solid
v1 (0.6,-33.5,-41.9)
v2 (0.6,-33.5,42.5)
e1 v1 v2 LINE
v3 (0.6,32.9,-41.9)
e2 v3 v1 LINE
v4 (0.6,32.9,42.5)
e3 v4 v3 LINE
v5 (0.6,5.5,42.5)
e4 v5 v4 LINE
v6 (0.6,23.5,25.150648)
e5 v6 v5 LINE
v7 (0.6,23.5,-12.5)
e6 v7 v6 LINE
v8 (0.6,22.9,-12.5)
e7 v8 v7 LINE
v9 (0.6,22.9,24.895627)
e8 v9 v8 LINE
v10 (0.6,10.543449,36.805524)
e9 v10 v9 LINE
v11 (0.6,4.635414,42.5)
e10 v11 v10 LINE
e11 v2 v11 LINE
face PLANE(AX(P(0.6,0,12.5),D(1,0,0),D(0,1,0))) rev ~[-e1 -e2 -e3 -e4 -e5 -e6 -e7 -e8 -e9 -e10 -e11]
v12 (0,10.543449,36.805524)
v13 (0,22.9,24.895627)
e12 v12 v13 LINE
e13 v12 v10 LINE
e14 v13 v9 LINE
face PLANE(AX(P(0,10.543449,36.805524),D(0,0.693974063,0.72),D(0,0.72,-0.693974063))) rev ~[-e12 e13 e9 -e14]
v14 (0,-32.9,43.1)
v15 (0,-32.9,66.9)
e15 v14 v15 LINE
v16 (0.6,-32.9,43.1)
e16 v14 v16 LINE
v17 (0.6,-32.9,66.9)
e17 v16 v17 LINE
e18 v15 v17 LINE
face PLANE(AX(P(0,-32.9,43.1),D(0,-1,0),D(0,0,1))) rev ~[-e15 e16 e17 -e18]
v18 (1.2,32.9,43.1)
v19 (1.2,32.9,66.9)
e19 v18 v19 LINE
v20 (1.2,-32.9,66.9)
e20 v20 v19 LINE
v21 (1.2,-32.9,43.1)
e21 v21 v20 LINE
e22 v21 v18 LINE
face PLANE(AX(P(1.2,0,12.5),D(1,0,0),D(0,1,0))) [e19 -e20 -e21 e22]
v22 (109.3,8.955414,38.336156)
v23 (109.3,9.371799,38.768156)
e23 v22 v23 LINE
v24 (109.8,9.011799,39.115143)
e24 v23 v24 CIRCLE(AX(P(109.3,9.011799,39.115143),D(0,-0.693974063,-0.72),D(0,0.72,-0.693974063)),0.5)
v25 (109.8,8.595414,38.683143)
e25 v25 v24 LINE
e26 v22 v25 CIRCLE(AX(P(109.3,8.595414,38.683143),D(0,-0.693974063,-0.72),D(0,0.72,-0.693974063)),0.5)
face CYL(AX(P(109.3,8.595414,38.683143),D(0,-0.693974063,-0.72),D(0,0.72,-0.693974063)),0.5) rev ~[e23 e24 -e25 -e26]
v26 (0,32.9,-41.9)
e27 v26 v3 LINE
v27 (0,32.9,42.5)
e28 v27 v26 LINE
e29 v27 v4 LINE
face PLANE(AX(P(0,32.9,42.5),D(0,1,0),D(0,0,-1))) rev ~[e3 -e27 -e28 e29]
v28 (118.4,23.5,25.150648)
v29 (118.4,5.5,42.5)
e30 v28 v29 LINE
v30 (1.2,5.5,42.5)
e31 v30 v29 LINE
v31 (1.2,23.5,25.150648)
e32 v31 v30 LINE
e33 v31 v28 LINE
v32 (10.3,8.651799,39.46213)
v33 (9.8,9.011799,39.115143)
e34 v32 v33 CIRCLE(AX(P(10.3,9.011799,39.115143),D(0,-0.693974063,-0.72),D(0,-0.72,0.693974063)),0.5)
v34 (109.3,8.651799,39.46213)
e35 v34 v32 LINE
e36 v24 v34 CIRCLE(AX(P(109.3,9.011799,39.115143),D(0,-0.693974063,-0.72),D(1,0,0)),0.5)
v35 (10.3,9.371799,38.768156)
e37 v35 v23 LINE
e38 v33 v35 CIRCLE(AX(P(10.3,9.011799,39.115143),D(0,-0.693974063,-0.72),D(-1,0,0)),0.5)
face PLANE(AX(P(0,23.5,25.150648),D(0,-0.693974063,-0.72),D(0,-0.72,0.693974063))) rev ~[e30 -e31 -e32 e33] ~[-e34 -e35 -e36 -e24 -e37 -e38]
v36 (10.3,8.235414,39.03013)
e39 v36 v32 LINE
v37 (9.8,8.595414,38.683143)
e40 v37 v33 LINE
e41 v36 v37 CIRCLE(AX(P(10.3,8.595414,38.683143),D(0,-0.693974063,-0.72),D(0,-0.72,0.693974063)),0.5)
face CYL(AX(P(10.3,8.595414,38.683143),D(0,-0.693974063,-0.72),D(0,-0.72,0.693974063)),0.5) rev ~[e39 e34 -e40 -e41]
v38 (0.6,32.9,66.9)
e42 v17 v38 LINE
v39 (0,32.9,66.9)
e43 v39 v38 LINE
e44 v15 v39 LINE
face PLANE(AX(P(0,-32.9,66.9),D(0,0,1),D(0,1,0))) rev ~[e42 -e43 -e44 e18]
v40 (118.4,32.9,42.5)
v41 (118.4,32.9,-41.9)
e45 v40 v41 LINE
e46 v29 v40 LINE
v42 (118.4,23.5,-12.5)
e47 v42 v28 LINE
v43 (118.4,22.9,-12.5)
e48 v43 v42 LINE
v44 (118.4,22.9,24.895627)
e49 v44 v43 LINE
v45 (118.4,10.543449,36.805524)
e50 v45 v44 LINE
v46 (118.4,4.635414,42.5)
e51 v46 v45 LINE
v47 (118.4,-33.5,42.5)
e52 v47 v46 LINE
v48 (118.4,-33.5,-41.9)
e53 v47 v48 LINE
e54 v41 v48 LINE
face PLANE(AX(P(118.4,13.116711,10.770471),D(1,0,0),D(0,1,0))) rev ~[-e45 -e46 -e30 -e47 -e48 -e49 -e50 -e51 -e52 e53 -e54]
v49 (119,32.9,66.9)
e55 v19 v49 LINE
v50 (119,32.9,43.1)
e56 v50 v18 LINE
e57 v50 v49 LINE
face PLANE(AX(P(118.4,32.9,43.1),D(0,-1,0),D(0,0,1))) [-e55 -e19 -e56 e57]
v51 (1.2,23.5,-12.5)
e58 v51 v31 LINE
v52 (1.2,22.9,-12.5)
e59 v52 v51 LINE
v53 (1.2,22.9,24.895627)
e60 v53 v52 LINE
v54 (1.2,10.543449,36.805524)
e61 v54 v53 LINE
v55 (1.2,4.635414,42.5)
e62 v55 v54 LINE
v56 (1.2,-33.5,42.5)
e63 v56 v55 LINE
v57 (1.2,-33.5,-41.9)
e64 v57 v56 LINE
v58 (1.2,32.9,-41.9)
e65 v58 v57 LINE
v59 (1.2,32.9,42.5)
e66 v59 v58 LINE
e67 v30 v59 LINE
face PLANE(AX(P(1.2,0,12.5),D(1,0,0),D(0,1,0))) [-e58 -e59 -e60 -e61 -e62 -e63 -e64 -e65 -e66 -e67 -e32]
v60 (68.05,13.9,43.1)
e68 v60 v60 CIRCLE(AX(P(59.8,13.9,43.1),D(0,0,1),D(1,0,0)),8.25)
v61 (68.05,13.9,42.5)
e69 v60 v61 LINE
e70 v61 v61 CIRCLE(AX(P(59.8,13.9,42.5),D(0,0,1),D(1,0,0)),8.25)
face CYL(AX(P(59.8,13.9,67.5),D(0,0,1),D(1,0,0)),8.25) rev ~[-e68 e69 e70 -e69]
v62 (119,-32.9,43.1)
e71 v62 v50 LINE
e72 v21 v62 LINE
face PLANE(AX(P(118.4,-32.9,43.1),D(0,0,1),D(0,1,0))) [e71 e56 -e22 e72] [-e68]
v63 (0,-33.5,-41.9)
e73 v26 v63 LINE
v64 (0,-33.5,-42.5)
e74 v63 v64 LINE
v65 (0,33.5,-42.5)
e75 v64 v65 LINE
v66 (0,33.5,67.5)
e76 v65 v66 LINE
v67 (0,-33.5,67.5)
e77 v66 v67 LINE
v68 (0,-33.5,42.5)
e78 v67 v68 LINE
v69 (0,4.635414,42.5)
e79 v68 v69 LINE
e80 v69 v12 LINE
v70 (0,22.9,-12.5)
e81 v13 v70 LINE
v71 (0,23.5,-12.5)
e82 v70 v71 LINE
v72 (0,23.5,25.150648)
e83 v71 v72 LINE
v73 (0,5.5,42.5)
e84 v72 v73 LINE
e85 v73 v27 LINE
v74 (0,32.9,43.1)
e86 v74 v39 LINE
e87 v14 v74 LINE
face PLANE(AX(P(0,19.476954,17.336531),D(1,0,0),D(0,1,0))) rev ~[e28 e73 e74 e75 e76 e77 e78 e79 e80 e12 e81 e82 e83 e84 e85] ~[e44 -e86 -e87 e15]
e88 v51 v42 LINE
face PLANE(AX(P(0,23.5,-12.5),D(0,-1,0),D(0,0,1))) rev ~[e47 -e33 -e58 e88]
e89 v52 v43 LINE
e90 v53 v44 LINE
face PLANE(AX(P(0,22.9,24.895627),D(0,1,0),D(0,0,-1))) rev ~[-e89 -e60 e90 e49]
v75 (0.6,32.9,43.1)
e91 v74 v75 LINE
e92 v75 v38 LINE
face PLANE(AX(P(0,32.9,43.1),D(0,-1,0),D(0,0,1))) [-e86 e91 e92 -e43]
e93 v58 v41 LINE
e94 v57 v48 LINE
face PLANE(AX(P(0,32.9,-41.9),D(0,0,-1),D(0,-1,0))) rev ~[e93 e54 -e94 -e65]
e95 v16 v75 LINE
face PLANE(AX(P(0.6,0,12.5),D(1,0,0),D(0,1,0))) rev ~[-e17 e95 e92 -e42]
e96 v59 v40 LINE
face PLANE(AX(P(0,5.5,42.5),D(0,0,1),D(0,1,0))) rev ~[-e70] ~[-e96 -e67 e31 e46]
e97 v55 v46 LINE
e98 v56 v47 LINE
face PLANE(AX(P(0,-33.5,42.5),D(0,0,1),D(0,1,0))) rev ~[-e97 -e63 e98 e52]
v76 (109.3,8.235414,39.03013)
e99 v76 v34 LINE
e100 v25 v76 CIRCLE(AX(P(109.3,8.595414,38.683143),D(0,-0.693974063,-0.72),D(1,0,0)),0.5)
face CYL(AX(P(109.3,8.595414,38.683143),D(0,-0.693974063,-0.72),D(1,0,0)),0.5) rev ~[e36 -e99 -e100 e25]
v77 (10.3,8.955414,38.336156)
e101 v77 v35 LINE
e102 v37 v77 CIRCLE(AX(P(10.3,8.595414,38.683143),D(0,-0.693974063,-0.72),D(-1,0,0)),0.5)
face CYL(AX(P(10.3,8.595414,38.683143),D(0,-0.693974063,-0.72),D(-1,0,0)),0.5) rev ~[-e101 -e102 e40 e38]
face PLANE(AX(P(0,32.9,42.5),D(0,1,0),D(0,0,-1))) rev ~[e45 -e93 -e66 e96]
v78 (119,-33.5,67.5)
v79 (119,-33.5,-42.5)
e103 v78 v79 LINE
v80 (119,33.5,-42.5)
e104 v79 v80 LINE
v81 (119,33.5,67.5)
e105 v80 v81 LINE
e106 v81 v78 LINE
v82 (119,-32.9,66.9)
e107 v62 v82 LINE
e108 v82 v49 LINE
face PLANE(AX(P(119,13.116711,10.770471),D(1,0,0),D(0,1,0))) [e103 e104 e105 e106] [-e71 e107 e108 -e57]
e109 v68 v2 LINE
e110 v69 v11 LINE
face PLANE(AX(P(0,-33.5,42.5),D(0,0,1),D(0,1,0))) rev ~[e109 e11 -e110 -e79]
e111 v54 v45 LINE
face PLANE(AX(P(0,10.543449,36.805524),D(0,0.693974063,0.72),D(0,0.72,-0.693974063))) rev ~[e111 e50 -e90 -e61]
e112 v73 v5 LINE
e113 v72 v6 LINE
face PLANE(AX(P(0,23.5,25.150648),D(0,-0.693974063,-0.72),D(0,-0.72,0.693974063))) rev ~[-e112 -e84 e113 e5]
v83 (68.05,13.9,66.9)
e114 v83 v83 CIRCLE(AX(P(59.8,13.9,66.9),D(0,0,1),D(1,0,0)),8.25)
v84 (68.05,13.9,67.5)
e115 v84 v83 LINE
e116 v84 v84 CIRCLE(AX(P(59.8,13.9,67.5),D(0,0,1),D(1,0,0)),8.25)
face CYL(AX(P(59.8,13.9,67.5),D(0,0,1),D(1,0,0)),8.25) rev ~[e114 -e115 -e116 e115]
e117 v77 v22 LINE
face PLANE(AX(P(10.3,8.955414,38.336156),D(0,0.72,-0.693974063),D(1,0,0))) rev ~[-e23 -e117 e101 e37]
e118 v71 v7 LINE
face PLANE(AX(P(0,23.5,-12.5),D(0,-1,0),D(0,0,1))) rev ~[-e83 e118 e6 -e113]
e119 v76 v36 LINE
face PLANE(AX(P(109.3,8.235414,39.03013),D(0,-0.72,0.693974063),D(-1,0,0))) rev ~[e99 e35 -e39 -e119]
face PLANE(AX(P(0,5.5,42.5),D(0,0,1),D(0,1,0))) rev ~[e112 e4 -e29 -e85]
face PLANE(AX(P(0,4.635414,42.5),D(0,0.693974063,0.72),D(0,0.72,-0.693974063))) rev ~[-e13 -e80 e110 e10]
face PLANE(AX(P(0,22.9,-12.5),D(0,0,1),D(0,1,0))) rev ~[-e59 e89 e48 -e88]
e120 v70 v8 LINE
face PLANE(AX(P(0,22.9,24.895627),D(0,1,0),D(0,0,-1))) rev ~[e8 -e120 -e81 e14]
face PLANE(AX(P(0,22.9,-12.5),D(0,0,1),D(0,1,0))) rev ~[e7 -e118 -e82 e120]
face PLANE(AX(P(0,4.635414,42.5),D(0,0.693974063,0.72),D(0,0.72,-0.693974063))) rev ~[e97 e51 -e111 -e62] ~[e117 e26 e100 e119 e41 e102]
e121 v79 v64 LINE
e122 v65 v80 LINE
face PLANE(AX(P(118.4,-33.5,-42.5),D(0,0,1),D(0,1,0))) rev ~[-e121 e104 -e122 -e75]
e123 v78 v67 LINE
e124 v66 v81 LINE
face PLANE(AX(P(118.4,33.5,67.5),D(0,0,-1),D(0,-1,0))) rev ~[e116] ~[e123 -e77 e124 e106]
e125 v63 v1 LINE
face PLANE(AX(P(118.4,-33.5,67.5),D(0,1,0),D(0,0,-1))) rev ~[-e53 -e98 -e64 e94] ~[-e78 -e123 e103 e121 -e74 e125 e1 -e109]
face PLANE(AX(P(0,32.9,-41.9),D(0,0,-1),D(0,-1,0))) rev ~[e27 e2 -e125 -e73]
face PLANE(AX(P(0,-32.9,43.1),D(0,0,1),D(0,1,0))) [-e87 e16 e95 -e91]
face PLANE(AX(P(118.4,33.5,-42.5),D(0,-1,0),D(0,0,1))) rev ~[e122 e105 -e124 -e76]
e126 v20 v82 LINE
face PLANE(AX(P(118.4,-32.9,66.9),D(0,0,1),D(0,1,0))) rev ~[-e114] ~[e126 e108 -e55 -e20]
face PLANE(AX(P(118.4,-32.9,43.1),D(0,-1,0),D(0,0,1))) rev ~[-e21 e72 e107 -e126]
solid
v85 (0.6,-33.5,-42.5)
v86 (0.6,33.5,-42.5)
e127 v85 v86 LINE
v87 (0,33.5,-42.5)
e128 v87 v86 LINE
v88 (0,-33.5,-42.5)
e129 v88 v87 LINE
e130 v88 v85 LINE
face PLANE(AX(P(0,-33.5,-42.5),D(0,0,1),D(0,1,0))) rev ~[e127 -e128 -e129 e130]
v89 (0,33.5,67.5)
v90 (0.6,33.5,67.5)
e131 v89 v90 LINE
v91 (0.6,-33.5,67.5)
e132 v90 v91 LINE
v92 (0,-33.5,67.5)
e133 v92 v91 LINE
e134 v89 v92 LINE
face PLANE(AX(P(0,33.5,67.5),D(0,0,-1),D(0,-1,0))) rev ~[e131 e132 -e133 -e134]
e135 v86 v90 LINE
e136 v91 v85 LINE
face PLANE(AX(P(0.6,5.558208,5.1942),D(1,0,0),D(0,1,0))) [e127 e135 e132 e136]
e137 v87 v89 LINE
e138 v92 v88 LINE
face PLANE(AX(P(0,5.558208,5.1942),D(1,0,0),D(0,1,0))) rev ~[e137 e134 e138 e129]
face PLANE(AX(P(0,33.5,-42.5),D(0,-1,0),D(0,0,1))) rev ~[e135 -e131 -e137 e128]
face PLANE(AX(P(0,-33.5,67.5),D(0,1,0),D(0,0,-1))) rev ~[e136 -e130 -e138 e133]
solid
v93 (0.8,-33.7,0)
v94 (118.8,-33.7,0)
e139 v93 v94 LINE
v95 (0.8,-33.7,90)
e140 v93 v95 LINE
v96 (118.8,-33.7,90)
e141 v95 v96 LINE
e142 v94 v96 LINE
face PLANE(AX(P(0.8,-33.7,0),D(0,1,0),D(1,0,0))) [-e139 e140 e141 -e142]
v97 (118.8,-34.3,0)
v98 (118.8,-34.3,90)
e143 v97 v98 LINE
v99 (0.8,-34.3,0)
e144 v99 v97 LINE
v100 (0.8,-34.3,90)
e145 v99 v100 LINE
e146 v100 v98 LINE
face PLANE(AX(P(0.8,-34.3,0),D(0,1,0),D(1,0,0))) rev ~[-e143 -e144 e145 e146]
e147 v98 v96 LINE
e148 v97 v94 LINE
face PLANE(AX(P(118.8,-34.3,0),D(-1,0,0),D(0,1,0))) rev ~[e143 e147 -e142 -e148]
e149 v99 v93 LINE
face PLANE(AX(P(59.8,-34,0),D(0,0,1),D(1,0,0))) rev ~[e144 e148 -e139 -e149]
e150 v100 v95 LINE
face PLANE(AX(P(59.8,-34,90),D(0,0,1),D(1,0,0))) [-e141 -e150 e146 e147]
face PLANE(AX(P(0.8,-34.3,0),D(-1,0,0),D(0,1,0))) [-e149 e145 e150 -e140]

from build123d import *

# Parameters (mm, degrees)
F0_W      = 65.8
F0_H      = 23.8
F1_DEPTH  = 118.4
F2_DEPTH  = 0.6
F3_W      = 65.8
F3_H      = 23.8
F2_FACE_W = 67
F2_FACE_H = 110
F4_DEPTH  = 0.6
F7_DEPTH  = 1
F8_W      = 118
F8_H      = 0.6
F9_DEPTH  = 90
F10_DEPTH = 25


# Not quite as in the source:
# - a feature names something its author has since deleted; it is built from what else it names


with BuildPart() as f1:
    # F0 (on Right) → F1 (new body)
    with BuildSketch(Plane.YZ):
        Polygon((5.5, 42.5), (4.6354143734, 42.5), (10.5434493031, 36.8055236056), (22.9, 24.8956268129), (22.9, -12.5), (23.5, -12.5), (23.5, 25.1506484271), align=None)
        Polygon((-33.5, -42.5), (33.5, -42.5), (33.5, 42.5), (33.5, 67.5), (-33.5, 67.5), (-33.5, 43.1), (-33.5, 42.5), (4.6354143734, 42.5), (5.5, 42.5), (32.9, 42.5), (32.9, -41.9), (-32.9, -41.9), (-33.5, -41.9), align=None)
        with Locations((0, 55)):
            Rectangle(F0_W, F0_H, mode=Mode.SUBTRACT)
    extrude(amount=F1_DEPTH)

    # F3 (on face) + F0 (on Right) + F2_face (on face) → F4 (join)
    with BuildSketch(Plane.YZ.offset(118.4)):
        Polygon((-33.5, -42.5), (33.5, -42.5), (33.5, 42.5), (33.5, 67.5), (-33.5, 67.5), (-33.5, 42.5), (4.6354143734, 42.5), (22.9, 24.8956268129), (22.9, -12.5), (23.5, -12.5), (23.5, 25.1506484271), (5.5, 42.5), (32.9, 42.5), (32.9, -41.9), (-33.5, -41.9), align=None)
        with Locations((0, 55)):
            Rectangle(F3_W, F3_H, mode=Mode.SUBTRACT)
        Polygon((-33.5, 42.5), (-33.5, -41.9), (32.9, -41.9), (32.9, 42.5), (5.5, 42.5), (23.5, 25.1506484271), (23.5, -12.5), (22.9, -12.5), (22.9, 24.8956268129), (4.6354143734, 42.5), align=None)
    with BuildSketch(Plane.YZ):
        Polygon((-33.5, -42.5), (33.5, -42.5), (33.5, 42.5), (33.5, 67.5), (-33.5, 67.5), (-33.5, 43.1), (-33.5, 42.5), (4.6354143734, 42.5), (5.5, 42.5), (32.9, 42.5), (32.9, -41.9), (-32.9, -41.9), (-33.5, -41.9), align=None)
        with Locations((0, 55)):
            Rectangle(F0_W, F0_H, mode=Mode.SUBTRACT)
    with BuildSketch(Plane(origin=(0.6, 0, 12.5), x_dir=(0, 1, 0), z_dir=(1, 0, 0))):
        Rectangle(F2_FACE_W, F2_FACE_H)
    extrude(amount=F4_DEPTH)

    # F6 (on face) → F7 (cut)
    with BuildSketch(Plane(origin=(0, 23.4680218875, 24.3481372891), x_dir=(1, 0, 0), z_dir=(0, -0.6939740629, -0.72))):
        with BuildLine():
            Line((10.3, 20.156399325), (109.3, 20.156399325))
            ThreePointArc((109.3, 20.156399325), (109.6535533906, 20.3028459345), (109.8, 20.656399325))
            ThreePointArc((109.8, 20.656399325), (109.6535533906, 21.0099527156), (109.3, 21.156399325))
            Line((109.3, 21.156399325), (10.3, 21.156399325))
            ThreePointArc((10.3, 21.156399325), (9.9464466094, 21.0099527156), (9.8, 20.656399325))
            ThreePointArc((9.8, 20.656399325), (9.9464466094, 20.3028459345), (10.3, 20.156399325))
        make_face()
    extrude(amount=-F7_DEPTH, mode=Mode.SUBTRACT)

    # F5 (on face) → F10 (cut)
    with BuildSketch(Plane.XY.offset(67.5)):
        with BuildLine():
            ThreePointArc((51.55, 13.8999999701), (59.8000000075, 5.649999985), (68.05, 13.899999985))
            Line((68.05, 13.8999999701), (51.55, 13.8999999701))
        make_face()
        with BuildLine():
            Line((51.55, 13.8999999701), (68.05, 13.8999999701))
            ThreePointArc((68.05, 13.899999985), (59.7999999925, 22.149999985), (51.55, 13.8999999701))
        make_face()
    extrude(amount=-F10_DEPTH, mode=Mode.SUBTRACT)


with BuildPart() as f2:
    # F0 (on Right) → F2 (new body)
    with BuildSketch(Plane.YZ):
        Polygon((-33.5, 42.5), (-33.5, -41.9), (-32.9, -41.9), (32.9, -41.9), (32.9, 42.5), (5.5, 42.5), (23.5, 25.1506484271), (23.5, -12.5), (22.9, -12.5), (22.9, 24.8956268129), (10.5434493031, 36.8055236056), (4.6354143734, 42.5), align=None)
        Polygon((-33.5, -42.5), (33.5, -42.5), (33.5, 42.5), (33.5, 67.5), (-33.5, 67.5), (-33.5, 43.1), (-33.5, 42.5), (4.6354143734, 42.5), (5.5, 42.5), (32.9, 42.5), (32.9, -41.9), (-32.9, -41.9), (-33.5, -41.9), align=None)
        with Locations((0, 55)):
            Rectangle(F0_W, F0_H, mode=Mode.SUBTRACT)
        with Locations((0, 55)):
            Rectangle(F0_W, F0_H)
        Polygon((5.5, 42.5), (4.6354143734, 42.5), (10.5434493031, 36.8055236056), (22.9, 24.8956268129), (22.9, -12.5), (23.5, -12.5), (23.5, 25.1506484271), align=None)
    extrude(amount=F2_DEPTH)


with BuildPart() as f9:
    # F8 (on Top) → F9 (new body)
    with BuildSketch(Plane.XY):
        with Locations((59.8, -34)):
            Rectangle(F8_W, F8_H)
    extrude(amount=F9_DEPTH)


solid = Compound([f1.part, f2.part, f9.part])
